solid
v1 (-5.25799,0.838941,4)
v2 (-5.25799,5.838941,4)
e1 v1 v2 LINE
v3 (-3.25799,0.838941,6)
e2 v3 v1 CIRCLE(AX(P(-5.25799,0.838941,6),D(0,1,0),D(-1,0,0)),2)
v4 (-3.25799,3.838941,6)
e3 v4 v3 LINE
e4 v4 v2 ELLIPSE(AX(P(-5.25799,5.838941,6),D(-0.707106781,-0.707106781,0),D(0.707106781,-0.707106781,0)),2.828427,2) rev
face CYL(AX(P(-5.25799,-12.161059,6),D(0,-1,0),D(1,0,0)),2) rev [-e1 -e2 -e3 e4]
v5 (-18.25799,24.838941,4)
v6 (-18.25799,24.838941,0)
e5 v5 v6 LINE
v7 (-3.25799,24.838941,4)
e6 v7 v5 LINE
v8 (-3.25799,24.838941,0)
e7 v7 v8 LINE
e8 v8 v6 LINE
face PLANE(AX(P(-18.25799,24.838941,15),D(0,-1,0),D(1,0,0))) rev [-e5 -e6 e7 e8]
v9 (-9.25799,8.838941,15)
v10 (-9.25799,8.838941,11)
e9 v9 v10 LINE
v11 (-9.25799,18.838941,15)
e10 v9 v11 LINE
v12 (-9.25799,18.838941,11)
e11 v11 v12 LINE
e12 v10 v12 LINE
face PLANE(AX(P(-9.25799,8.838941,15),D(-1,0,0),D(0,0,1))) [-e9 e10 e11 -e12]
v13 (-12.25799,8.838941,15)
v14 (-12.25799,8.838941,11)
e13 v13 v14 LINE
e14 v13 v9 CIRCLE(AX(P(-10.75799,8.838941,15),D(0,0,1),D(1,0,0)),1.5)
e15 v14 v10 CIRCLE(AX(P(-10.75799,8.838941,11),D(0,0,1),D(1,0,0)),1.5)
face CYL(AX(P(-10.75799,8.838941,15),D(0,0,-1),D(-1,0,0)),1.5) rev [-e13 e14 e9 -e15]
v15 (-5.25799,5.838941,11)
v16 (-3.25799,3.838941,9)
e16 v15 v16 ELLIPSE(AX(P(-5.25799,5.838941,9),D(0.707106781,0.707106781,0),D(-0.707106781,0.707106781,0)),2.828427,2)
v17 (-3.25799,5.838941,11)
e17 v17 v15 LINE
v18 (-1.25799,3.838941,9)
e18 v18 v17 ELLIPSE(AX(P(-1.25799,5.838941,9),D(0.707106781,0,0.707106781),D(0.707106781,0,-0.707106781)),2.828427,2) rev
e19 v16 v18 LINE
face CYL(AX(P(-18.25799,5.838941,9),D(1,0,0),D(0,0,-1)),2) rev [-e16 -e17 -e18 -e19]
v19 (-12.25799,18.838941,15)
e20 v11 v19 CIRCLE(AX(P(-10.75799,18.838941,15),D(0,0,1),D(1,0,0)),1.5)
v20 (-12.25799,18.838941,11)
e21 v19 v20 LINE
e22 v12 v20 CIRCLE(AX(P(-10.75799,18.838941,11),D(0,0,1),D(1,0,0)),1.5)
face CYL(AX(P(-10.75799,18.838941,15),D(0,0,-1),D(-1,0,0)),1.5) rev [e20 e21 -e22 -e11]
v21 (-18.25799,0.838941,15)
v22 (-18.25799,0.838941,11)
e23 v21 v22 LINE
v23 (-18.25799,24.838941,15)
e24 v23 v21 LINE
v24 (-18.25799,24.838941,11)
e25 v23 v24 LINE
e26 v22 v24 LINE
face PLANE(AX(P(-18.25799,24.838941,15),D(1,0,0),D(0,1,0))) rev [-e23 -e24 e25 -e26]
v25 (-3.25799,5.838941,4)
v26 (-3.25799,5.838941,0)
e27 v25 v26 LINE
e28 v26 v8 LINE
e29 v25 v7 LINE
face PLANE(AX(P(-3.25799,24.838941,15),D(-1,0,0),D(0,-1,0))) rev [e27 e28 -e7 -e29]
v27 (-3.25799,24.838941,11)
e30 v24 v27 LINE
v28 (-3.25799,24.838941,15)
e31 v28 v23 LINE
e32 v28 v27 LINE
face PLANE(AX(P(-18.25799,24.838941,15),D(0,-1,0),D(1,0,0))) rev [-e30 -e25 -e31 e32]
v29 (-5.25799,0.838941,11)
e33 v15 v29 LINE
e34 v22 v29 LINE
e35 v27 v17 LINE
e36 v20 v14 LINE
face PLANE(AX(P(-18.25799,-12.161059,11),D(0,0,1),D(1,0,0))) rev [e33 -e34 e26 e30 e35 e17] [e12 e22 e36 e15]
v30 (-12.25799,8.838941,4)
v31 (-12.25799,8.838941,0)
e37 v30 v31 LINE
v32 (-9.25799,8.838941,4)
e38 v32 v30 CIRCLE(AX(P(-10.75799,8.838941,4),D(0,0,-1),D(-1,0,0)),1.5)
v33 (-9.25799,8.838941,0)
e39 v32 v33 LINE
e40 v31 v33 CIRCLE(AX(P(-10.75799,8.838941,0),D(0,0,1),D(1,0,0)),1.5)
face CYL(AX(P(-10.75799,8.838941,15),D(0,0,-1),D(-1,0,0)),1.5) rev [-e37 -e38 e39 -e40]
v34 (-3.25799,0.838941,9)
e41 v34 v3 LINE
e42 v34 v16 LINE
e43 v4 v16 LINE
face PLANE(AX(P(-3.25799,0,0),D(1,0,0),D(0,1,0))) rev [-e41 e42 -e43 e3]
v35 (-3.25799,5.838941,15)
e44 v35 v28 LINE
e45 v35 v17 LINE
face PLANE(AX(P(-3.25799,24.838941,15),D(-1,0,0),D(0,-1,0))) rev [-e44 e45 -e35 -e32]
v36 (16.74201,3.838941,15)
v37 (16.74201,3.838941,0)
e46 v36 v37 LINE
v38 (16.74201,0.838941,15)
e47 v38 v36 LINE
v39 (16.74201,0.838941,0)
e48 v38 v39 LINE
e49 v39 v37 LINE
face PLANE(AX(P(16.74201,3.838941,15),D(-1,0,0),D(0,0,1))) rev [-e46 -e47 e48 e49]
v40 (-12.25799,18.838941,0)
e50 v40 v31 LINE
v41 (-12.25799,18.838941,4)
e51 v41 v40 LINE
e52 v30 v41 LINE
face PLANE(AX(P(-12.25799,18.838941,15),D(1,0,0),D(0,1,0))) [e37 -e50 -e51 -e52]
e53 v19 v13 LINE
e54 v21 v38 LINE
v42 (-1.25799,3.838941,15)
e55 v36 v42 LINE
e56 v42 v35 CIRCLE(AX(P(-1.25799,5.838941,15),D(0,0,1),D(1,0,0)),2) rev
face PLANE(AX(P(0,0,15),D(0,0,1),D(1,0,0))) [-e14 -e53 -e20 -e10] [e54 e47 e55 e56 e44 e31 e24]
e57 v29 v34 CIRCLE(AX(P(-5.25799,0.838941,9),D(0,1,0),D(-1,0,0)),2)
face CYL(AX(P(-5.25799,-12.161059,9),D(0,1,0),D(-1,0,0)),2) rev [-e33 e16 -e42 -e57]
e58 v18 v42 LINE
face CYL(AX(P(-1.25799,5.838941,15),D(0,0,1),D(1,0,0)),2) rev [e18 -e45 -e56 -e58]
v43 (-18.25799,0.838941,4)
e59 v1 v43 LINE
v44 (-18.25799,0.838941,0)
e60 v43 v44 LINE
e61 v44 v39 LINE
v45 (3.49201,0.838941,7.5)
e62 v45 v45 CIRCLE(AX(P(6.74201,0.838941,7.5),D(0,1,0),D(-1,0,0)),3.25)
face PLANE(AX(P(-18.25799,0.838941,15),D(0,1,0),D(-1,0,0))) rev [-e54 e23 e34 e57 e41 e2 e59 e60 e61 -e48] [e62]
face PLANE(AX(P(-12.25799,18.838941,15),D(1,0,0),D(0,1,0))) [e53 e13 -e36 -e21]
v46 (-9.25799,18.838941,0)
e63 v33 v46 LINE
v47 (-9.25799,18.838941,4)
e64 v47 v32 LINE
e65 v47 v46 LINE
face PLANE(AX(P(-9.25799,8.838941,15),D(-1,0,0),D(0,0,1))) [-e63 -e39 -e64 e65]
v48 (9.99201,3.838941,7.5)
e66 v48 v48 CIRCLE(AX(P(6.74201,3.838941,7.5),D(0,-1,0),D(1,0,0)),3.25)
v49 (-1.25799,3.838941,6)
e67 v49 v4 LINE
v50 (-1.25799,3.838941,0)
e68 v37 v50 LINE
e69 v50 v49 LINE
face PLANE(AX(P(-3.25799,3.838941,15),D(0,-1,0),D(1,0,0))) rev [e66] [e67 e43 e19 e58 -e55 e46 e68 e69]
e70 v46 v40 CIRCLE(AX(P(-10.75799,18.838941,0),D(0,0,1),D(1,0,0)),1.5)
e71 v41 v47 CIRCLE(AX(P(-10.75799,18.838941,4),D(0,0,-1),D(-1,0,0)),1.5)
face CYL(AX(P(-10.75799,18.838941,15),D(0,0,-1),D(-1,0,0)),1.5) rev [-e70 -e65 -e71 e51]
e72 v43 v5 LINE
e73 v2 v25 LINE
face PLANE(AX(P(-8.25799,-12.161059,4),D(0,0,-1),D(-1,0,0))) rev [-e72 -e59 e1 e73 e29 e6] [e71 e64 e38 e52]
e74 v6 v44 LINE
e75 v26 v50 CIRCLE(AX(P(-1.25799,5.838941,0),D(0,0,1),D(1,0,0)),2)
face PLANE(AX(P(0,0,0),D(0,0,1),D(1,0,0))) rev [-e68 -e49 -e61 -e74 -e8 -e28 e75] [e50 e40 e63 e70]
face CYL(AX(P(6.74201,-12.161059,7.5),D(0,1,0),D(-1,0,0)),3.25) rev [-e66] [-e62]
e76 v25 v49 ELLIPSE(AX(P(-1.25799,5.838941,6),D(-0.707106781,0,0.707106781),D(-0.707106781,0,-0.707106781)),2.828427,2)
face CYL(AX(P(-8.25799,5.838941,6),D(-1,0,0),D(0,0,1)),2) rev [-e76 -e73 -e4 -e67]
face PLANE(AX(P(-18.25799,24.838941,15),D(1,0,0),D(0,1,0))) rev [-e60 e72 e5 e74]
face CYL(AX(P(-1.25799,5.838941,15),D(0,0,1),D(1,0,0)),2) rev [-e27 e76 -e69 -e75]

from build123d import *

# Parameters (mm, degrees)
EXTRUDE_1_DEPTH     = 15
SKETCH_2_R          = 3.25
SKETCH_2_W          = 10
SKETCH_2_H          = 7
CUT_EXTRUDE_1_DEPTH = 37
SKETCH_3_W          = 7
SKETCH_3_H          = 25
CUT_EXTRUDE_2_DEPTH = 37
FILLET_1_R          = 2
FILLET_2_R          = 2


with BuildPart() as part:
    # 草图1 → 凸台-拉伸1 (new body)
    with BuildSketch(Plane.XY):
        Polygon((-3.257989732, 3.83894099), (16.742010268, 3.83894099), (16.742010268, 0.83894099), (-18.257989732, 0.83894099), (-18.257989732, 24.83894099), (-3.257989732, 24.83894099), align=None)
        with BuildLine():
            Line((-12.257989732, 18.83894099), (-12.257989732, 8.83894099))
            ThreePointArc((-12.257989732, 8.83894099), (-10.757989732, 7.33894099), (-9.257989732, 8.83894099))
            Line((-9.257989732, 8.83894099), (-9.257989732, 18.83894099))
            ThreePointArc((-9.257989732, 18.83894099), (-10.757989732, 20.33894099), (-12.257989732, 18.83894099))
        make_face(mode=Mode.SUBTRACT)
    extrude(amount=EXTRUDE_1_DEPTH)

    # 草图2 → 切除-拉伸1 (cut)
    with BuildSketch(Plane(origin=(0, 24.83894099, 0), x_dir=(1, 0, 0), z_dir=(0, 1, 0))):
        with Locations(Location((6.742010268, -7.5, 0), (0, 0, 180))):
            Circle(SKETCH_2_R)
        with Locations((-13.257989732, -7.5)):
            Rectangle(SKETCH_2_W, SKETCH_2_H)
    extrude(amount=-CUT_EXTRUDE_1_DEPTH, mode=Mode.SUBTRACT)

    # 草图3 → 切除-拉伸2 (cut)
    with BuildSketch(Plane(origin=(-3.257989732, 0, 0), x_dir=(0, 0, -1), z_dir=(1, 0, 0))):
        with Locations((-7.5, 12.33894099)):
            Rectangle(SKETCH_3_W, SKETCH_3_H)
    extrude(amount=-CUT_EXTRUDE_2_DEPTH, mode=Mode.SUBTRACT)

    # 圆角1
    fillet_1_edges = [part.edges().sort_by_distance(p)[0] for p in [
        (-3.257989732, 2.33894099, 11),
        (-3.257989732, 2.33894099, 4),
    ]]
    fillet(fillet_1_edges, radius=FILLET_1_R)

    # 圆角2
    fillet_2_edges = [part.edges().sort_by_distance(p)[0] for p in [
        (-3.257989732, 3.83894099, 2),
        (-3.257989732, 3.83894099, 13),
        (-4.257989732, 3.83894099, 11),
        (-4.257989732, 3.83894099, 4),
    ]]
    fillet(fillet_2_edges, radius=FILLET_2_R - 0.0001)  # a hair under: the kernel refuses the full size


solid = part.part
